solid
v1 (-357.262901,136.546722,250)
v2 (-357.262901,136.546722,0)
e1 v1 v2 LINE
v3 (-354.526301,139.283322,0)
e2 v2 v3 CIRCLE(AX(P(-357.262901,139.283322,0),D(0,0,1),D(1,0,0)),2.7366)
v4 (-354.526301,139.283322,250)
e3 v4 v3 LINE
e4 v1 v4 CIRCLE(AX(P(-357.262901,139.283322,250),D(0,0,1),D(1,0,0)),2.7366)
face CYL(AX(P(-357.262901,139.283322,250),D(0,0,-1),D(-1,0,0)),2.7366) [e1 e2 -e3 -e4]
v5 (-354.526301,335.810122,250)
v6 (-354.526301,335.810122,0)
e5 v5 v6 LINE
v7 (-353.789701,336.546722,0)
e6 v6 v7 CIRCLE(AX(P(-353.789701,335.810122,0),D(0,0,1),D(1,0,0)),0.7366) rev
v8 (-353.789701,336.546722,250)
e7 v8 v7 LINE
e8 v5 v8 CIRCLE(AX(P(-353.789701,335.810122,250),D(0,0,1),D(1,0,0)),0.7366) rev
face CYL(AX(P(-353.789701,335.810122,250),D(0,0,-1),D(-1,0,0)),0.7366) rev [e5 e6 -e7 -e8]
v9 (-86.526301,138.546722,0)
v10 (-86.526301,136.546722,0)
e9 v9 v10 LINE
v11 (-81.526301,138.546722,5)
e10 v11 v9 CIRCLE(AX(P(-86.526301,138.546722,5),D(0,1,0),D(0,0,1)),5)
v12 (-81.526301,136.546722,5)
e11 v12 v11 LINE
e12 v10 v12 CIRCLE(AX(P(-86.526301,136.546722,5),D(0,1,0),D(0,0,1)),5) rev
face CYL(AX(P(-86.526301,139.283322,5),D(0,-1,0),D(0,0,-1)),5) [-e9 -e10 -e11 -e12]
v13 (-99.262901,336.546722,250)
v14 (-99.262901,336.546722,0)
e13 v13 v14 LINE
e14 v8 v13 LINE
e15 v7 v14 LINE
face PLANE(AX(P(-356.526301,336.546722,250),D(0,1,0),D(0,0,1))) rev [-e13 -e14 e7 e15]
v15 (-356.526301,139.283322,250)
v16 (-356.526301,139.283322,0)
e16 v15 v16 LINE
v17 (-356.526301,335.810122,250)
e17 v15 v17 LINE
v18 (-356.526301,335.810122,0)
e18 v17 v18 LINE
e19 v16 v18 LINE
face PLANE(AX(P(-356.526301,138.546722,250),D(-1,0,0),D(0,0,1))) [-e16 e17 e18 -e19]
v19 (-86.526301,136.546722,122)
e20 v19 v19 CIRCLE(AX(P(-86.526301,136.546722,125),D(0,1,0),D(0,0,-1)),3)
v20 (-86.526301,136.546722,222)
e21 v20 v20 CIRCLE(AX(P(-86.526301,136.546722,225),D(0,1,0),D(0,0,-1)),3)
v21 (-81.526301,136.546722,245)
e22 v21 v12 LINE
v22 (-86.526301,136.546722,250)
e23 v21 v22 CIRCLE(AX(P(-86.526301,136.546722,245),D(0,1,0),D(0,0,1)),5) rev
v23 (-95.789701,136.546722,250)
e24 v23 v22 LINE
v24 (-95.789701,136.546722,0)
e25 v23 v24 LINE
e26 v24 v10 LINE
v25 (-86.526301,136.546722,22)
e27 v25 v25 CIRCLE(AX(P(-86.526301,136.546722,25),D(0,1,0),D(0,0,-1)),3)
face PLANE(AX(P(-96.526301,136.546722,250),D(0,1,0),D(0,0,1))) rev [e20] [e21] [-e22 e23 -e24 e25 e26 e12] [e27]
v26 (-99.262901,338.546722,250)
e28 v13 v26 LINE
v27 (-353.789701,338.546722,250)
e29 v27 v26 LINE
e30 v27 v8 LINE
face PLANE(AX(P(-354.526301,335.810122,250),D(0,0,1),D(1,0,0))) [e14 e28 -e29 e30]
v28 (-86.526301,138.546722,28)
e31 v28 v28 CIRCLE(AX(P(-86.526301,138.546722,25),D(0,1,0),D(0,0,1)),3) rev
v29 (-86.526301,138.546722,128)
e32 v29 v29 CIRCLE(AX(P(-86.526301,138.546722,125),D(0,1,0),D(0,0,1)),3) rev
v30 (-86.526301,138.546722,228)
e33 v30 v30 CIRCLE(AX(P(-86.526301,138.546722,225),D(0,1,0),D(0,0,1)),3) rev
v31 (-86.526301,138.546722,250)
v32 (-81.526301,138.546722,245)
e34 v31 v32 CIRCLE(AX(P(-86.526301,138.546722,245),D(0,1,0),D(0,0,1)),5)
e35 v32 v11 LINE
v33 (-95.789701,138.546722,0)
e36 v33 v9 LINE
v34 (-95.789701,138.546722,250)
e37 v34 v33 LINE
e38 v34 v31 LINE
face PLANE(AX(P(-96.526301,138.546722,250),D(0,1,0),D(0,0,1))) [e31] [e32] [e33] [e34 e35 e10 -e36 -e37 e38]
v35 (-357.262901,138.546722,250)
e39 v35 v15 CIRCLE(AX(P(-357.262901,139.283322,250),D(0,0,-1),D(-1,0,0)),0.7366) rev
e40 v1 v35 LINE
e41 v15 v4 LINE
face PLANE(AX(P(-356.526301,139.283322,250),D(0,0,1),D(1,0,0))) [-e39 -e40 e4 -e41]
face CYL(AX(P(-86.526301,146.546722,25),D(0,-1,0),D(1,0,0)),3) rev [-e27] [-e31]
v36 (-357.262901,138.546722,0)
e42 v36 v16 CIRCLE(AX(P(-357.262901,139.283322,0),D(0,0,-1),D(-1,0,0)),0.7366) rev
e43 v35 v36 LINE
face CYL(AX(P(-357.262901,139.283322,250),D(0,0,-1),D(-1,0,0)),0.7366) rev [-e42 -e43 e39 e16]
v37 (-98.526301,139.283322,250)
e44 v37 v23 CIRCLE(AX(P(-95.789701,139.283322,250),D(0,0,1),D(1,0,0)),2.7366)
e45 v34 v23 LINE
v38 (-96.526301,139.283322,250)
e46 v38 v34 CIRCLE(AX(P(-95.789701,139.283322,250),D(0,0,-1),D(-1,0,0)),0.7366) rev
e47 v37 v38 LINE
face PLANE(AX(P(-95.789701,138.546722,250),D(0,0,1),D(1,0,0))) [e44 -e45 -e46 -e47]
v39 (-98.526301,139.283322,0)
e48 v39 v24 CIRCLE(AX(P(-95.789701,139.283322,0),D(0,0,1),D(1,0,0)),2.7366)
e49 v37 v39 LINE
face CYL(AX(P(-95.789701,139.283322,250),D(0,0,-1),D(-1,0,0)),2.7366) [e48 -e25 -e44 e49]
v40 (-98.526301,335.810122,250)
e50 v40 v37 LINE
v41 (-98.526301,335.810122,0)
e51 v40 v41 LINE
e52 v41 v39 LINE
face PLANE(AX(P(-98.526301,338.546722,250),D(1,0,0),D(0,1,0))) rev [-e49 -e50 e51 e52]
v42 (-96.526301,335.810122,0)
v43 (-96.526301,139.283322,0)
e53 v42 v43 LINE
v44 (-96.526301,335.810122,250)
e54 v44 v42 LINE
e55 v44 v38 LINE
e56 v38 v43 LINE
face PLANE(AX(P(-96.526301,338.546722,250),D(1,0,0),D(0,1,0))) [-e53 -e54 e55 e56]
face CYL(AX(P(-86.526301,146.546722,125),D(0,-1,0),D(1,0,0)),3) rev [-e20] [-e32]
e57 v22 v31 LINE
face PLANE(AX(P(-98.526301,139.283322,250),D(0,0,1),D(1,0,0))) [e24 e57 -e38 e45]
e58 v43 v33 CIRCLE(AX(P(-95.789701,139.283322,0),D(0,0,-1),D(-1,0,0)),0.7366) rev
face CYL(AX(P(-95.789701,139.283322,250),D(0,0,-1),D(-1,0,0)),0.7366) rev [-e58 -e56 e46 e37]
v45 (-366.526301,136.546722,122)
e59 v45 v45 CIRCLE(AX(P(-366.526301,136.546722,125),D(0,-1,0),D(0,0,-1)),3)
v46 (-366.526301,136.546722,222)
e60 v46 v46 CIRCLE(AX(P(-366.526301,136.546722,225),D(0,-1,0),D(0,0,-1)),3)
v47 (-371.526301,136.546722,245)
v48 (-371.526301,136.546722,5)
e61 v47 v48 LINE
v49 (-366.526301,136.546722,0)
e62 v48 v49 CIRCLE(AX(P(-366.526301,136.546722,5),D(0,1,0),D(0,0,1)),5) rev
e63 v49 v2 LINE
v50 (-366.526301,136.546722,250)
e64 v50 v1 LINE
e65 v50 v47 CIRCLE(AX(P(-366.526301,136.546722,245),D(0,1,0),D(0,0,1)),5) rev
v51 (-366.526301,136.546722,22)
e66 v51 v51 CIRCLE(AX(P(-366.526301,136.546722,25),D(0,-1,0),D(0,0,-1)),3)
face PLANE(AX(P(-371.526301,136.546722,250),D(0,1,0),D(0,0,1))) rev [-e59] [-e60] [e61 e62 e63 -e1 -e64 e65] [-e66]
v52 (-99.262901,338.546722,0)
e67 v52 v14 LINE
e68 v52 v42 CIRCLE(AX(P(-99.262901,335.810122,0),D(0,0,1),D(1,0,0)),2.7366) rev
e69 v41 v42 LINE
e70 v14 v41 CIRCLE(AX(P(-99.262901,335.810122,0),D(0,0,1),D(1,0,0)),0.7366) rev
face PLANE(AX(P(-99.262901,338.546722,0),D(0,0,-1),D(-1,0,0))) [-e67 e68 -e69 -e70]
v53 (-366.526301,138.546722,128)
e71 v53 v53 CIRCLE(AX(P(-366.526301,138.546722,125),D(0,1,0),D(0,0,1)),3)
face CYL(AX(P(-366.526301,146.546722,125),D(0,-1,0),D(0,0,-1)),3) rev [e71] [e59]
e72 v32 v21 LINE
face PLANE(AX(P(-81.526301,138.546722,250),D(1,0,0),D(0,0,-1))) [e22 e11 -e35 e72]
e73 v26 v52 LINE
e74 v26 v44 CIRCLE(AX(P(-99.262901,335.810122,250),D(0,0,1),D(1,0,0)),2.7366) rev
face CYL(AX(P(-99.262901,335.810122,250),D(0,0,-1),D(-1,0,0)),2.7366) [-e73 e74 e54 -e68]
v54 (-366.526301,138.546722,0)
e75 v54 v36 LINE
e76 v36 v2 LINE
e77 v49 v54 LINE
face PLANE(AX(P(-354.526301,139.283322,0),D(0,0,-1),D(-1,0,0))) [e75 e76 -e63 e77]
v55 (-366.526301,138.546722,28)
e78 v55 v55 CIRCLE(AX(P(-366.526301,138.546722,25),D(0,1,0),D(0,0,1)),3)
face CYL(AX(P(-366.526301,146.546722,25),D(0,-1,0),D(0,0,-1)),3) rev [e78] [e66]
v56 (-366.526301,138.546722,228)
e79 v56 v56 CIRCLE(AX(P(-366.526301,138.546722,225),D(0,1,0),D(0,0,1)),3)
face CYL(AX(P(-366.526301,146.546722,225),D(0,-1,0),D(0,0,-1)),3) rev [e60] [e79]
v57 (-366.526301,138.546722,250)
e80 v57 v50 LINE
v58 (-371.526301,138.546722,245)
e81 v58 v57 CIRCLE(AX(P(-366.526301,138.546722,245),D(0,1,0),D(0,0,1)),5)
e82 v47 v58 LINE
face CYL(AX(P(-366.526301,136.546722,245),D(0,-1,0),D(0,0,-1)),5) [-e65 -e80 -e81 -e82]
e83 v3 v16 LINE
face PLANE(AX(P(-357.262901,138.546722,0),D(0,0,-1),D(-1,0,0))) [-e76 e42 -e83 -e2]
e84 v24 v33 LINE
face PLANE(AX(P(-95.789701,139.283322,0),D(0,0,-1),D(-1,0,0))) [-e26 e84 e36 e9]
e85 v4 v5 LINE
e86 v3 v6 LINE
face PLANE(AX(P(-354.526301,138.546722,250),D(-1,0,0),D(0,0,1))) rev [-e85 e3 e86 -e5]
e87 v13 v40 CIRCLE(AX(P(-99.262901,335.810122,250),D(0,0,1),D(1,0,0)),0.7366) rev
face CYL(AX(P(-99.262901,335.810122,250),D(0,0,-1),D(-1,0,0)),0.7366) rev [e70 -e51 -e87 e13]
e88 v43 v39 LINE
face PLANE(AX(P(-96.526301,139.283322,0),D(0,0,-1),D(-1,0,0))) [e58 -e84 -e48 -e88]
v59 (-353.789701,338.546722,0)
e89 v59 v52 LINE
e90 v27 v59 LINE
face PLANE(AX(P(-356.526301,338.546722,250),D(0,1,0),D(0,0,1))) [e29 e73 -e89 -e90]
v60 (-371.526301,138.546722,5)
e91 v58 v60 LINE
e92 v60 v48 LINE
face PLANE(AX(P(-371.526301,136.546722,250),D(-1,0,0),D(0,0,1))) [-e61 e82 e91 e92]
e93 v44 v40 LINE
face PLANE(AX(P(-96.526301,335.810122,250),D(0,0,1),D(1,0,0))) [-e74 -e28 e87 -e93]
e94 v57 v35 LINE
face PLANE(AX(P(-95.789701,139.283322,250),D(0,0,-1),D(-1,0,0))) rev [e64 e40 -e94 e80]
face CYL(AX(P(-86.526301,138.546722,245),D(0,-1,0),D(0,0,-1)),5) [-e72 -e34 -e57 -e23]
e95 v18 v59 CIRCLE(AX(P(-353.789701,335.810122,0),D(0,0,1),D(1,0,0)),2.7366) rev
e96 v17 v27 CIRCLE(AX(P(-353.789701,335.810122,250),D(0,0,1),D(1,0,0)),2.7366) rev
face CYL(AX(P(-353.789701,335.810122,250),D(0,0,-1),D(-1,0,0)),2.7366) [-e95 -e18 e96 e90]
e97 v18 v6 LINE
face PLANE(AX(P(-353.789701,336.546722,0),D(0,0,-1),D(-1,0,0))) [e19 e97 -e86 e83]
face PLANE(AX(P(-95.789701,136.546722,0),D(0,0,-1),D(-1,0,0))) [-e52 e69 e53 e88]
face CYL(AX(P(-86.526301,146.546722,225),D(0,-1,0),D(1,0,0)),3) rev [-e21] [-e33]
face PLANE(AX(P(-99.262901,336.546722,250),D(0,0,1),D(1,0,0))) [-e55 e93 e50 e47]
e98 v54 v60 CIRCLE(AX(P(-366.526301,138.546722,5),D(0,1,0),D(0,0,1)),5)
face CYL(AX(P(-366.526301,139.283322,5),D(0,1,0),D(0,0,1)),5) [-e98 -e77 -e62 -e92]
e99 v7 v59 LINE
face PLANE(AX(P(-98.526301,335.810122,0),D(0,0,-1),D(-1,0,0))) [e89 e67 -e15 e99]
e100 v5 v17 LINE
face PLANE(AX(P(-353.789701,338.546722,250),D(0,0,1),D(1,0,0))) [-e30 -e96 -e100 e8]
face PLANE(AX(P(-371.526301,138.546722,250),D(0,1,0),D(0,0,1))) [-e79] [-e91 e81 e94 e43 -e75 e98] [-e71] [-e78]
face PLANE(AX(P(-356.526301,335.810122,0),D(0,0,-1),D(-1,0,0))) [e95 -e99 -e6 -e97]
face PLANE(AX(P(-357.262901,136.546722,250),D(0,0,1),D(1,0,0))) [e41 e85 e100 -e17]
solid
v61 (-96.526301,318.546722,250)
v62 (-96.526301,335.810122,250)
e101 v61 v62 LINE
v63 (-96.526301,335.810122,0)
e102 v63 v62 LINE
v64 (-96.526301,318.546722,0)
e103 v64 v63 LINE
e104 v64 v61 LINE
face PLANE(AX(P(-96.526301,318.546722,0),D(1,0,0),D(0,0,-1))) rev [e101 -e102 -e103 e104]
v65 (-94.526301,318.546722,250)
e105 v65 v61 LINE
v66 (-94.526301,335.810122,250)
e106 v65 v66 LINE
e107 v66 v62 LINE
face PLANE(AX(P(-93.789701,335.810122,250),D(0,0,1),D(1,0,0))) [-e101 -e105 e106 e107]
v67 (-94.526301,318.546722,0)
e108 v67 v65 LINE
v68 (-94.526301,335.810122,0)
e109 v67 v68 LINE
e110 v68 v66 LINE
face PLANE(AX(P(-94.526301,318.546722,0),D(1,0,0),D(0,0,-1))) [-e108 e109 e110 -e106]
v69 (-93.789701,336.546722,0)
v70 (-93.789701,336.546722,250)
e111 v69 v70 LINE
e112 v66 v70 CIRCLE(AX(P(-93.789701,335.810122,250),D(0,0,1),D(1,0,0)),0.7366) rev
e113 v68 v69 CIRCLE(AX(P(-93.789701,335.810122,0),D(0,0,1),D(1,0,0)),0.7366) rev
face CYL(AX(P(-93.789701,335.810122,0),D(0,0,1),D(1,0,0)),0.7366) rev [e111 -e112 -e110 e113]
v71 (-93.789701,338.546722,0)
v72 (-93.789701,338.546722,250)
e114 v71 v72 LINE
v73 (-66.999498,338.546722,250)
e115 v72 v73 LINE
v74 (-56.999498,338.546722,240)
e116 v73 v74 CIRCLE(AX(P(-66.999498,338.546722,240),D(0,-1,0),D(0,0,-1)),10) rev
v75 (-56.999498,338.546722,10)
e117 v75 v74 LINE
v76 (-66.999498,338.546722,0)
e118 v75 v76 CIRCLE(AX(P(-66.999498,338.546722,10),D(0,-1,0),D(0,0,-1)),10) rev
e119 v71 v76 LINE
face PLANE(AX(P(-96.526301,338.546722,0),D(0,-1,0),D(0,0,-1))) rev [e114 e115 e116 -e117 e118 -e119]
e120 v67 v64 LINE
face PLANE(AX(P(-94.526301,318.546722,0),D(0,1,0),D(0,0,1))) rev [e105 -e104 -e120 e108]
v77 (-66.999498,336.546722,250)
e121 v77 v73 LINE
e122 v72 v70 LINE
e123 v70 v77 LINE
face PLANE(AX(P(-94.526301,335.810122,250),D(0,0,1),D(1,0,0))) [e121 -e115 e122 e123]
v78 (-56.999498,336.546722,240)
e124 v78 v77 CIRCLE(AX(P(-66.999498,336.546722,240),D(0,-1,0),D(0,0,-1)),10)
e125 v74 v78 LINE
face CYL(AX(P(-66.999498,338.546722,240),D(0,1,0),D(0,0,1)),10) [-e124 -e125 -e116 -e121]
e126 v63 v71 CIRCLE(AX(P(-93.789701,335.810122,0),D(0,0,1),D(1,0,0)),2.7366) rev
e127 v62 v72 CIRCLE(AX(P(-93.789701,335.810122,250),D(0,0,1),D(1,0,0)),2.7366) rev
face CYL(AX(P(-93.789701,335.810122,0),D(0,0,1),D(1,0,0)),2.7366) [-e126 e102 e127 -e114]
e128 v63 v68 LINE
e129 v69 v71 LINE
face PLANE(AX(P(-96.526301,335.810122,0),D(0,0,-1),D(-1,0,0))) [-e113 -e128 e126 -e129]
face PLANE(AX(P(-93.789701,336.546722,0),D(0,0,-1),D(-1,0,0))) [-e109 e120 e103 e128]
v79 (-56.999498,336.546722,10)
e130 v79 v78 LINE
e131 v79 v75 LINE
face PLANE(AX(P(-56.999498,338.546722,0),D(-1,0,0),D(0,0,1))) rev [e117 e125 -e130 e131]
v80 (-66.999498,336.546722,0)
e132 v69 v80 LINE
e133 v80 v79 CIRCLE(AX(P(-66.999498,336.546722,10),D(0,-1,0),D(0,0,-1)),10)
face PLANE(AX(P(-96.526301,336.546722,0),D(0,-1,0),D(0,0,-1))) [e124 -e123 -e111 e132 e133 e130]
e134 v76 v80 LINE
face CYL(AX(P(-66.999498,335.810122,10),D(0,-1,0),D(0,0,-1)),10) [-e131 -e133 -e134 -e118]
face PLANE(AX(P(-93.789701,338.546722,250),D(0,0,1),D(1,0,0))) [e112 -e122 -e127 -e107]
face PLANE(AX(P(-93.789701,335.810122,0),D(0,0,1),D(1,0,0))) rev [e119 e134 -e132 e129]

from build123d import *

# Parameters (mm, degrees)
SM_BASE_FLANGE_1_DEPTH = 250
SM_BASE_FLANGE_2_DEPTH = 250
FILLET_1_R             = 10
FILLET_2_R             = 5
SKETCH_9_R             = 3
CUT_EXTRUDE_1_DEPTH    = 10


# Sheet-metal steps are written as plain solids
with BuildPart() as part:
    # Sketch 1 → 基体-法兰1 (new body)
    with BuildSketch(Plane.XY):
        with BuildLine():
            Line((-371.526300738, 138.546722129), (-357.262900738, 138.546722129))
            ThreePointArc((-357.262900738, 138.546722129), (-356.742045883, 138.762467274), (-356.526300738, 139.283322129))
            Line((-356.526300738, 139.283322129), (-356.526300738, 335.810122129))
            ThreePointArc((-356.526300738, 335.810122129), (-355.724769156, 337.745190547), (-353.789700738, 338.546722129))
            Line((-353.789700738, 338.546722129), (-99.262900738, 338.546722129))
            ThreePointArc((-99.262900738, 338.546722129), (-97.327832321, 337.745190547), (-96.526300738, 335.810122129))
            Line((-96.526300738, 335.810122129), (-96.526300738, 139.283322129))
            ThreePointArc((-96.526300738, 139.283322129), (-96.310555593, 138.762467274), (-95.789700738, 138.546722129))
            Line((-95.789700738, 138.546722129), (-81.526300738, 138.546722129))
            Line((-81.526300738, 138.546722129), (-81.526300738, 136.546722129))
            Line((-81.526300738, 136.546722129), (-95.789700738, 136.546722129))
            ThreePointArc((-95.789700738, 136.546722129), (-97.724769156, 137.348253712), (-98.526300738, 139.283322129))
            Line((-98.526300738, 139.283322129), (-98.526300738, 335.810122129))
            ThreePointArc((-98.526300738, 335.810122129), (-98.742045883, 336.330976984), (-99.262900738, 336.546722129))
            Line((-99.262900738, 336.546722129), (-353.789700738, 336.546722129))
            ThreePointArc((-353.789700738, 336.546722129), (-354.310555593, 336.330976984), (-354.526300738, 335.810122129))
            Line((-354.526300738, 335.810122129), (-354.526300738, 139.283322129))
            ThreePointArc((-354.526300738, 139.283322129), (-355.327832321, 137.348253712), (-357.262900738, 136.546722129))
            Line((-357.262900738, 136.546722129), (-371.526300738, 136.546722129))
            Line((-371.526300738, 136.546722129), (-371.526300738, 138.546722129))
        make_face()
    extrude(amount=SM_BASE_FLANGE_1_DEPTH)

    # 圆角2
    fillet_2_edges = [part.edges().sort_by_distance(p)[0] for p in [
        (-371.526300738, 137.546722129, 0),
        (-81.526300738, 137.546722129, 0),
        (-371.526300738, 137.546722129, 250),
        (-81.526300738, 137.546722129, 250),
    ]]
    fillet(fillet_2_edges, radius=FILLET_2_R)

    # 草图9 → 切除-拉伸1 (cut)
    with BuildSketch(Plane.XZ.offset(-136.546722129)):
        with Locations(Location((-366.526300738, 225, 0), (0, 0, 270))):
            Circle(SKETCH_9_R)
        with Locations(Location((-366.526300738, 125, 0), (0, 0, 270))):
            Circle(SKETCH_9_R)
        with Locations(Location((-366.526300738, 25, 0), (0, 0, 270))):
            Circle(SKETCH_9_R)
    cut_extrude_1 = extrude(amount=-CUT_EXTRUDE_1_DEPTH, mode=Mode.SUBTRACT)

    # 镜向1: 切除-拉伸1 across plane
    add(cut_extrude_1.mirror(Plane(origin=(-226.526300738, 0, 0), x_dir=(0, 0, 1), z_dir=(1, 0, 0))), mode=Mode.SUBTRACT)


with BuildPart() as body_2:
    # 草图6 → 基体-法兰2 (new body)
    with BuildSketch(Plane.XY.offset(250)):
        with BuildLine():
            Line((-96.526300738, 318.546722129), (-96.526300738, 335.810122129))
            ThreePointArc((-96.526300738, 335.810122129), (-95.724769156, 337.745190547), (-93.789700738, 338.546722129))
            Line((-93.789700738, 338.546722129), (-56.999497946, 338.546722129))
            Line((-56.999497946, 338.546722129), (-56.999497946, 336.546722129))
            Line((-56.999497946, 336.546722129), (-93.789700738, 336.546722129))
            ThreePointArc((-93.789700738, 336.546722129), (-94.310555593, 336.330976984), (-94.526300738, 335.810122129))
            Line((-94.526300738, 335.810122129), (-94.526300738, 318.546722129))
            Line((-94.526300738, 318.546722129), (-96.526300738, 318.546722129))
        make_face()
    extrude(amount=-SM_BASE_FLANGE_2_DEPTH)

    # 圆角1
    fillet_1_edges = [body_2.edges().sort_by_distance(p)[0] for p in [
        (-56.999497946, 337.546722129, 0),
        (-56.999497946, 337.546722129, 250),
    ]]
    fillet(fillet_1_edges, radius=FILLET_1_R)


solid = Compound([part.part, body_2.part])
